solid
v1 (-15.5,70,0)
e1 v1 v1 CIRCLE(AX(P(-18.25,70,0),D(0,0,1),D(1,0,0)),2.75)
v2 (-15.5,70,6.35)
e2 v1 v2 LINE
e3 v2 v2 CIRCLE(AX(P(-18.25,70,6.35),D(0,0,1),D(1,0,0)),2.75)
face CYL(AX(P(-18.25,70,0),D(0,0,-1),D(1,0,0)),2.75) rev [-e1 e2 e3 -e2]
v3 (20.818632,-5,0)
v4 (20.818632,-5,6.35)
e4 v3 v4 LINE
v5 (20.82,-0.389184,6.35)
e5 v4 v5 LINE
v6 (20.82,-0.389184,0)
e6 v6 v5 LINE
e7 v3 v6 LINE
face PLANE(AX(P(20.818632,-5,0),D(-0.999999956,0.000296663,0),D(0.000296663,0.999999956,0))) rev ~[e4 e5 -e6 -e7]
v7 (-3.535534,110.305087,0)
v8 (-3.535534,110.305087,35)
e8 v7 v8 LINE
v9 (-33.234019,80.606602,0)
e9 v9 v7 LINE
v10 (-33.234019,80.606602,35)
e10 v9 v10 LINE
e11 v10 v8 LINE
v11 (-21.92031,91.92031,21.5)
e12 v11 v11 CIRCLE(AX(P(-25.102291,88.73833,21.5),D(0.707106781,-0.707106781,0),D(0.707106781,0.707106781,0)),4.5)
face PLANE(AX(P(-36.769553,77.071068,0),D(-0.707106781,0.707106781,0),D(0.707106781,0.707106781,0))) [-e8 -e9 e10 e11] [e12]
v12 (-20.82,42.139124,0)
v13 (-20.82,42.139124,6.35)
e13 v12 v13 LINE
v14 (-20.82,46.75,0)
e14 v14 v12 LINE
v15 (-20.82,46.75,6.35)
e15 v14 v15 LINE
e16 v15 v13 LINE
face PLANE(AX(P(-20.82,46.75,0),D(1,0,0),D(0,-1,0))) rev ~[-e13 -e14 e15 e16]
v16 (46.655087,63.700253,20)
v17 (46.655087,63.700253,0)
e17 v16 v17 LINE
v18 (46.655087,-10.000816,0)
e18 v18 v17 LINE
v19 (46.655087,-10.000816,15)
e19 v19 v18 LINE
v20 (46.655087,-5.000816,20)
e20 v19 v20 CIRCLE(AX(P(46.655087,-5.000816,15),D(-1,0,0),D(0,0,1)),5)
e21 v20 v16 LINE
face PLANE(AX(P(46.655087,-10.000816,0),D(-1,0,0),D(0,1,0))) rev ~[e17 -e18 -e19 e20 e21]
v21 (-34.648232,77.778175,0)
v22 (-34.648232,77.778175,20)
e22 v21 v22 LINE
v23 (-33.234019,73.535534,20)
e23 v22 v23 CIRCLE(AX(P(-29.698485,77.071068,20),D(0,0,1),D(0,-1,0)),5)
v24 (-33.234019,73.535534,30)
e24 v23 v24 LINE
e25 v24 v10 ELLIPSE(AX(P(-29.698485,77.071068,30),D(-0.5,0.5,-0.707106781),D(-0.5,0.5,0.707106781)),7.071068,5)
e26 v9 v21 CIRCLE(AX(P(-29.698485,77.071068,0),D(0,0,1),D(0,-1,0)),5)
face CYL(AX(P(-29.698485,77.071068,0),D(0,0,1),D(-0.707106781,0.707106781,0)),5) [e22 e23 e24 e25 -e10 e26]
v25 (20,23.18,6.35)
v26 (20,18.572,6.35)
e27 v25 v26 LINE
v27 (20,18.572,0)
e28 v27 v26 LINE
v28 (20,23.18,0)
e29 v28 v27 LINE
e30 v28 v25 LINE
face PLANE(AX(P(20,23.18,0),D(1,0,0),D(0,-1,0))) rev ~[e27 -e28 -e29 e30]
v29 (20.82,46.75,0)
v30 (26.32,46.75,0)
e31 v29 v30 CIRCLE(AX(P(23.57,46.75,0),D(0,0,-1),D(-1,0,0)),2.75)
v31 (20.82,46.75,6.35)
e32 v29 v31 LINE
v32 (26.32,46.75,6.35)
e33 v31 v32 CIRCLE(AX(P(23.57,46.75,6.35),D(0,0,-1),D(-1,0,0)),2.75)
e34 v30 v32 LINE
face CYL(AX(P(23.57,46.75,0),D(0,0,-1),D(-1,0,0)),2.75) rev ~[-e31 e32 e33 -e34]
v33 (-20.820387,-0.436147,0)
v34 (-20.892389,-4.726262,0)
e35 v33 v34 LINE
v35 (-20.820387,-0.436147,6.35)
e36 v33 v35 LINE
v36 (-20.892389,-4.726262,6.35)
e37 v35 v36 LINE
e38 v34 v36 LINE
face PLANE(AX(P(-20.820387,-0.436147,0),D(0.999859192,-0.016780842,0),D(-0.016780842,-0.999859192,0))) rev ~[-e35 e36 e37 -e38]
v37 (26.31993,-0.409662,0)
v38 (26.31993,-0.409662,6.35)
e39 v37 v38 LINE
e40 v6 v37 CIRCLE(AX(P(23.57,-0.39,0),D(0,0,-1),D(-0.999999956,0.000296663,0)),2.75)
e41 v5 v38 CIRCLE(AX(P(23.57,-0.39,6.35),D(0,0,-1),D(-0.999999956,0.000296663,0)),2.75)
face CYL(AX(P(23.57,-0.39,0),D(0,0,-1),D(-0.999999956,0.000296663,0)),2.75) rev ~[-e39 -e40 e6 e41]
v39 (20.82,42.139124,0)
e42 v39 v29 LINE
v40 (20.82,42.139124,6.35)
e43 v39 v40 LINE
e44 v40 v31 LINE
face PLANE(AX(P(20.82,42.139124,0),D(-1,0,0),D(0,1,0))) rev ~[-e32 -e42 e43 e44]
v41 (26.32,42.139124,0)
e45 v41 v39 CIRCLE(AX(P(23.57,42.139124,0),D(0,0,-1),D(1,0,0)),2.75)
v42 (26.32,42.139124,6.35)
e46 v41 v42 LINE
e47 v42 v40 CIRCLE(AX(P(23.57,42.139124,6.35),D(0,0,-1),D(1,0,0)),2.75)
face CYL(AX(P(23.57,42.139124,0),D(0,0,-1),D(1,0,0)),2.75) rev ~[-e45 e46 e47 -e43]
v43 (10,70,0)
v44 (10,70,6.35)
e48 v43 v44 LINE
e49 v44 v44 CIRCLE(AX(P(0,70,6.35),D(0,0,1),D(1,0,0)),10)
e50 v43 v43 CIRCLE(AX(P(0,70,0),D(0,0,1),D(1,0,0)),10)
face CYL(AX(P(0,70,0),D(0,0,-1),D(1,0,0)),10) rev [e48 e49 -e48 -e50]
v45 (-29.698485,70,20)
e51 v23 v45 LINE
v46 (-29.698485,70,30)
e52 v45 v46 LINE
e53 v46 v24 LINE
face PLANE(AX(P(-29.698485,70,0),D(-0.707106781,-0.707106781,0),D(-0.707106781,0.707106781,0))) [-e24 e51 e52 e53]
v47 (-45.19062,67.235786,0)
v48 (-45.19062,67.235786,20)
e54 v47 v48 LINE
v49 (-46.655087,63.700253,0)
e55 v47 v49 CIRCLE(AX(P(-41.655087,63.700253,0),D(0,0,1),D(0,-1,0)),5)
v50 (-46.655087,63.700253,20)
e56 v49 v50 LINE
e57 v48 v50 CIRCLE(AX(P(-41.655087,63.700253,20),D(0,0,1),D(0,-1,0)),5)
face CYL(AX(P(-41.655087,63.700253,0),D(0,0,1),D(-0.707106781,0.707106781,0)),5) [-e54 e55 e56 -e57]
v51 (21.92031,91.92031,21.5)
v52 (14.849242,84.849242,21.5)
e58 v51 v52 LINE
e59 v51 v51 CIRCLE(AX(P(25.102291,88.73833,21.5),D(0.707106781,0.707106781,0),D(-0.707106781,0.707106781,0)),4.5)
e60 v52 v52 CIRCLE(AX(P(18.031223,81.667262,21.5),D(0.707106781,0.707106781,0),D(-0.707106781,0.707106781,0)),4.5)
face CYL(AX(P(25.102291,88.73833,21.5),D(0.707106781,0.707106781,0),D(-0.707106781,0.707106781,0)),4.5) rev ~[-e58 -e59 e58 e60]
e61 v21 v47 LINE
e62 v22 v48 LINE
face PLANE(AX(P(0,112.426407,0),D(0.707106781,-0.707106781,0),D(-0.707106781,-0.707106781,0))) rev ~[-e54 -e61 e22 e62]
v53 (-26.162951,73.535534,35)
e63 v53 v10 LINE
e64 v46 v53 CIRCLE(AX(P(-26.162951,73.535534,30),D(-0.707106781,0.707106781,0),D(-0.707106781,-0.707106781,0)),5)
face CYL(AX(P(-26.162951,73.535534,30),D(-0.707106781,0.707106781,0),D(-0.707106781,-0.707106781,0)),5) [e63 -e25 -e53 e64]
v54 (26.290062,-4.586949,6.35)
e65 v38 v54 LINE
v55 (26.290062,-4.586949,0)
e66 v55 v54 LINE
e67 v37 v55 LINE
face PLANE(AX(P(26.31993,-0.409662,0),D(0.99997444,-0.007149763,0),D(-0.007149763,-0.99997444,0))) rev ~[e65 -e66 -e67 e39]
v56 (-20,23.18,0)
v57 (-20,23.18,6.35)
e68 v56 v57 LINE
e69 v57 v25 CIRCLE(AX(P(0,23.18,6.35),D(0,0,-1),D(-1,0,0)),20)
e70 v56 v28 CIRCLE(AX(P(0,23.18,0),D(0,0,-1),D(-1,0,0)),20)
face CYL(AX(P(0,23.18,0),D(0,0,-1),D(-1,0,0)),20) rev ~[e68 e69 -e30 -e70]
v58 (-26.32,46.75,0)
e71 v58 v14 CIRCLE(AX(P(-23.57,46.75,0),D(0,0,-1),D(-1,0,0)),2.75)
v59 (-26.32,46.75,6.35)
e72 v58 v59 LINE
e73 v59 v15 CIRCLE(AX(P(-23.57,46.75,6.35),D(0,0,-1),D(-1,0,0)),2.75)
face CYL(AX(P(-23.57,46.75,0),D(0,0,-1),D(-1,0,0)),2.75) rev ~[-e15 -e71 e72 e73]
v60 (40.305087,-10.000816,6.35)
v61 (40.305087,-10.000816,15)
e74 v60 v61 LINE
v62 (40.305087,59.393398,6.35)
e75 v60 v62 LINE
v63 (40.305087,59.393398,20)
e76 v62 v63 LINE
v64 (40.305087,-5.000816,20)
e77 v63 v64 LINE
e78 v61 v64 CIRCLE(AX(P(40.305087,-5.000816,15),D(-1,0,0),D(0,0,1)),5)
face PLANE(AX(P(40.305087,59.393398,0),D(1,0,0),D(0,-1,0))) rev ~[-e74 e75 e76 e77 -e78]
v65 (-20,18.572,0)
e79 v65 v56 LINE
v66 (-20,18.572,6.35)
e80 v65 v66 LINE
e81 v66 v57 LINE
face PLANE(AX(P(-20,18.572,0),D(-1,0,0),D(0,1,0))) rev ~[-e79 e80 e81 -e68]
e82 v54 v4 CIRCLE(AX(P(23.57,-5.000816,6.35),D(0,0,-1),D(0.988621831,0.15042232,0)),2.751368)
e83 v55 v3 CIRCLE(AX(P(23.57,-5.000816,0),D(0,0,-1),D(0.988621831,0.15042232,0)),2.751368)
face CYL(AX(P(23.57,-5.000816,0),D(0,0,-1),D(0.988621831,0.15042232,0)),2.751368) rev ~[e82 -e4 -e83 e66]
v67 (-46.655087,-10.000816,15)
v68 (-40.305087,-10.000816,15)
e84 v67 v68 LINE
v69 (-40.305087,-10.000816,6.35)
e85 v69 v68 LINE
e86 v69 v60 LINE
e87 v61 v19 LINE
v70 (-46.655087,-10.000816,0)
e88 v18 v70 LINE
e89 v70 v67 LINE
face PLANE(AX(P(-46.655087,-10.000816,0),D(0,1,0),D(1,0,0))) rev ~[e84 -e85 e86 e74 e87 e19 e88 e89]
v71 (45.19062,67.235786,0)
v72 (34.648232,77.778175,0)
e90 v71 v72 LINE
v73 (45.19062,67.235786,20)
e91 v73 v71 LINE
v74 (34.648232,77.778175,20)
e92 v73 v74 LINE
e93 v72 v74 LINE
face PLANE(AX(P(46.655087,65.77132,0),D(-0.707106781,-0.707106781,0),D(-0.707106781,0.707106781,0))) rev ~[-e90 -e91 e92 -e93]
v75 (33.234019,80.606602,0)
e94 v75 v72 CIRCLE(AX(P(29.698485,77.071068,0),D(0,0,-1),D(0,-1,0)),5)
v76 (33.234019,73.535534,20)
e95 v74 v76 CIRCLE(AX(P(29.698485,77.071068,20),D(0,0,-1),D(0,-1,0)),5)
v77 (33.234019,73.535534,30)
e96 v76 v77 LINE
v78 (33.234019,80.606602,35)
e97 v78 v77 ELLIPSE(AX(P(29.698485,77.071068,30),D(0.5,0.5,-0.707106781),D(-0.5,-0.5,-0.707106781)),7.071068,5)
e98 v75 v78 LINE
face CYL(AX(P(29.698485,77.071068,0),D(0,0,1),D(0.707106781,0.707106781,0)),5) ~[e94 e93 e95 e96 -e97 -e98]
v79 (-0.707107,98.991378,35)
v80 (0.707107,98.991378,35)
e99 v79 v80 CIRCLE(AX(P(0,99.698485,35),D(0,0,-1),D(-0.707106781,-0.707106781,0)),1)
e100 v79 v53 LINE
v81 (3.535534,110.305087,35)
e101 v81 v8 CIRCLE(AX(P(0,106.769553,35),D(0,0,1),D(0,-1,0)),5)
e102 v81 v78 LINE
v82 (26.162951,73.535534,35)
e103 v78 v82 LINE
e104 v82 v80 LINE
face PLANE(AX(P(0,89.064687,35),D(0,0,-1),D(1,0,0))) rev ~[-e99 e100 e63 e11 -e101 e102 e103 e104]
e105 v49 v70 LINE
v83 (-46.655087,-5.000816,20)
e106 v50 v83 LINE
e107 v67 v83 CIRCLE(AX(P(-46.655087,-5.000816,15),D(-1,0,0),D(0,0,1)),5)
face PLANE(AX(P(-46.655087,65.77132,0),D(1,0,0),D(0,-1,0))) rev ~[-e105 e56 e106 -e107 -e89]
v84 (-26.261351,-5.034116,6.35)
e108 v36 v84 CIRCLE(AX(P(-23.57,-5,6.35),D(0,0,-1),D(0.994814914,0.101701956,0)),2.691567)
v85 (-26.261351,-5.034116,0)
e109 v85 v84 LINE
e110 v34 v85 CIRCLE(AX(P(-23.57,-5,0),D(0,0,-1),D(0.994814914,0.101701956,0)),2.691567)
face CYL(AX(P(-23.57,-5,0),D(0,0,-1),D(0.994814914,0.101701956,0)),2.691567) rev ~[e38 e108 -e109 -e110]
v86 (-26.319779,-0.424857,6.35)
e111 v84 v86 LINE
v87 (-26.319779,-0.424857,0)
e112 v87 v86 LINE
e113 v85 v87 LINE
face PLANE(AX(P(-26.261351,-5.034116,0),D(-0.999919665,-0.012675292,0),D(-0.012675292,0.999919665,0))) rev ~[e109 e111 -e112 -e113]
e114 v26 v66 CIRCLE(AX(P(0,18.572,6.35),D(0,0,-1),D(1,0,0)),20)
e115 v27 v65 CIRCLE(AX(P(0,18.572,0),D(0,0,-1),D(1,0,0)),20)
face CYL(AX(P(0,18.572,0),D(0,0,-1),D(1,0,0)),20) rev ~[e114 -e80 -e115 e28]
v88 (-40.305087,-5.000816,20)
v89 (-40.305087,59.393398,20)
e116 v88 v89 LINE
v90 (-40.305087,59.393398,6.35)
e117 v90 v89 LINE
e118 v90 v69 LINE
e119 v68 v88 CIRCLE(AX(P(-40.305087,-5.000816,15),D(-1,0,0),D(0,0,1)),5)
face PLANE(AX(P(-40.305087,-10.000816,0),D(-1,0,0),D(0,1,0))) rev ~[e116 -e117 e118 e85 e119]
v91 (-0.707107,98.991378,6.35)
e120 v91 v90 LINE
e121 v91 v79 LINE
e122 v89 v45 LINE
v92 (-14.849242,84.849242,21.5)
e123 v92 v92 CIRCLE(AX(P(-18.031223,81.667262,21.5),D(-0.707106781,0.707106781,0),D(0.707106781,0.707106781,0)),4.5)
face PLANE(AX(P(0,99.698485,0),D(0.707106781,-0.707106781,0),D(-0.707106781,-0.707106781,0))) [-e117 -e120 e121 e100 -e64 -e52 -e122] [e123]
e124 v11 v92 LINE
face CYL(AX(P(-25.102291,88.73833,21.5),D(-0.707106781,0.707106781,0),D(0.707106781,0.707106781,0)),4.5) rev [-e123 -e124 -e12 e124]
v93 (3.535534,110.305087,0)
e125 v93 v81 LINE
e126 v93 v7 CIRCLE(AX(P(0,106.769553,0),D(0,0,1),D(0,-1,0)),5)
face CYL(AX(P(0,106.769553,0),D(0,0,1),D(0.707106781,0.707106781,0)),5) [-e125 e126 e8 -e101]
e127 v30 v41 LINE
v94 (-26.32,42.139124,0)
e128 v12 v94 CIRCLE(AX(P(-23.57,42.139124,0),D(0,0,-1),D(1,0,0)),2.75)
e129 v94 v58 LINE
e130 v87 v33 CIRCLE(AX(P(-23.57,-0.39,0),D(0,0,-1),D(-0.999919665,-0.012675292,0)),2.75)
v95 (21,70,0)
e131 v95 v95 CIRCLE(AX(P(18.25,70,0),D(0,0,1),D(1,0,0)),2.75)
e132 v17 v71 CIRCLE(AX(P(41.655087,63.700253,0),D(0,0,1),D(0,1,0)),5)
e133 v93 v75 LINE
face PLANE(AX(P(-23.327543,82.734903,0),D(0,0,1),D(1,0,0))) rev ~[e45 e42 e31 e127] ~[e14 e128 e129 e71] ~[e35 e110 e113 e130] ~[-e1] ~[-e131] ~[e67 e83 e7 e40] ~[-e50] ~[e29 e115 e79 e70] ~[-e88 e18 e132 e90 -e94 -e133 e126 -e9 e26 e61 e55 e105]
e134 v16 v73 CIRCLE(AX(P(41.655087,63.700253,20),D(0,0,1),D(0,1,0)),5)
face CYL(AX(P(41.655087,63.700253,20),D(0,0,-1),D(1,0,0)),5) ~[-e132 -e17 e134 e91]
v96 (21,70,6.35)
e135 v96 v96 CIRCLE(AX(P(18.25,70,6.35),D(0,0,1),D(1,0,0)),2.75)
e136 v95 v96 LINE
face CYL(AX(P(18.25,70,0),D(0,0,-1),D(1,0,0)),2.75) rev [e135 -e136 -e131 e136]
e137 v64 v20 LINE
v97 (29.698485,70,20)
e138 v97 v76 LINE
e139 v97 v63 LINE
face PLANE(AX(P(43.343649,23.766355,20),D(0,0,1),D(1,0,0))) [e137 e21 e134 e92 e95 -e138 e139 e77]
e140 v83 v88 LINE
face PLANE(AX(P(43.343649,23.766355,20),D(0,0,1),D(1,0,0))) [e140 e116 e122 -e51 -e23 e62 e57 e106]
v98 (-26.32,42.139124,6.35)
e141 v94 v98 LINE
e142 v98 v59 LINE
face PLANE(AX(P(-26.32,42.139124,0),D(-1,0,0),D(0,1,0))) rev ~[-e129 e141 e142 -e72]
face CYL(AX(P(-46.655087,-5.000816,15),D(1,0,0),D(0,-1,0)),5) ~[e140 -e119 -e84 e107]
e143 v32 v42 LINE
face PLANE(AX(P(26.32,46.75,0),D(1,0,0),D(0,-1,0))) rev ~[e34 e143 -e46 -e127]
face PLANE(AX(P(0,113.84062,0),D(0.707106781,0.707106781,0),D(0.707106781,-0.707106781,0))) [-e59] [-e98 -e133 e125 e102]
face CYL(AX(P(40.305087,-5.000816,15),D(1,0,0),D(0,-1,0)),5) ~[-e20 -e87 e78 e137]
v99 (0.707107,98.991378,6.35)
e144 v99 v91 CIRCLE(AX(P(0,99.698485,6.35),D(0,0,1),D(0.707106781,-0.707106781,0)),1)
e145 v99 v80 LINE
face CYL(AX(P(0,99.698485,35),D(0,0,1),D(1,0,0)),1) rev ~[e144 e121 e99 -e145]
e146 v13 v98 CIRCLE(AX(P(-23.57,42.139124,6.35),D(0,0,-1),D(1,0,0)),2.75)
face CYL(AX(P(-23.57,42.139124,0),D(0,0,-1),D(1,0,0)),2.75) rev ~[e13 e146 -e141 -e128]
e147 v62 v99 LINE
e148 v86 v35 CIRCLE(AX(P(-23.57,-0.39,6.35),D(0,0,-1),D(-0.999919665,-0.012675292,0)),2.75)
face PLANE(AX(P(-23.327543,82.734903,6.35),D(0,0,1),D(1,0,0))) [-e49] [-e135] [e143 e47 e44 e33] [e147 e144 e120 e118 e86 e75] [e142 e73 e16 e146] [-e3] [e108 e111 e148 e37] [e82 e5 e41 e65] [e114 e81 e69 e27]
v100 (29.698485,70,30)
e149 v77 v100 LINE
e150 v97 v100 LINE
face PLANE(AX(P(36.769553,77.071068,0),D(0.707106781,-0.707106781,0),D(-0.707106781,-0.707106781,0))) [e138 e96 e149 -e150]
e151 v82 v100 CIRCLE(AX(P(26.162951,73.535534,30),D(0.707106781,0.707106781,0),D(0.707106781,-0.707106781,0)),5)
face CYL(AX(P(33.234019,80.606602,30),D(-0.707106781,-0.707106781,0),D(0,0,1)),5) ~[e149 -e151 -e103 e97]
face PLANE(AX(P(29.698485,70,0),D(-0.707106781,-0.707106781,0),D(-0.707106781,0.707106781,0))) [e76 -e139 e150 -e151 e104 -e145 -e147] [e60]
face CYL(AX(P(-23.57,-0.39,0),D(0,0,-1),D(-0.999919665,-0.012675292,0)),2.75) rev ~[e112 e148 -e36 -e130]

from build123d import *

# Parameters (mm, degrees)
F0_R      = 2.75
F0_R_2    = 10
F1_DEPTH  = 6.35
F3_DEPTH  = 6.35
F4_DEPTH  = 20
F6_DEPTH  = 35
F7_R      = 4.5
F8_DEPTH  = 12.6
F9_R      = 5
F10_R     = 1
F11_DEPTH = 28.65


# Not quite as in the source:
# - a feature names something its author has since deleted; it is built from what else it names


with BuildPart() as f1:
    # F0 (on Top) → F1 (new body)
    with BuildSketch(Plane.XY):
        Polygon((0, 99.6984848098), (-29.6984848098, 70), (-29.6984848098, -10.0008162295), (29.6984848098, -10.0008162295), (29.6984848098, 70), align=None)
        with BuildLine():
            Line((-26.2613506757, -5.0341163975), (-26.3197790794, -0.4248570541))
            ThreePointArc((-26.3197790794, -0.4248570541), (-23.5643542567, 2.3599942046), (-20.8203872227, -0.436147316))
            Line((-20.8203872227, -0.436147316), (-20.892389105, -4.7262623825))
            ThreePointArc((-20.892389105, -4.7262623825), (-23.4159197643, -7.6871530789), (-26.2613506757, -5.0341163975))
        make_face(mode=Mode.SUBTRACT)
        with BuildLine():
            ThreePointArc((-26.32, 46.75), (-23.57, 49.5), (-20.82, 46.75))
            Line((-20.82, 46.75), (-20.82, 42.1391243117))
            ThreePointArc((-20.82, 42.1391243117), (-23.57, 39.3891243117), (-26.32, 42.1391243117))
            Line((-26.32, 42.1391243117), (-26.32, 46.75))
        make_face(mode=Mode.SUBTRACT)
        with BuildLine():
            ThreePointArc((-20, 23.18), (0, 43.18), (20, 23.18))
            Line((20, 23.18), (20, 18.572))
            ThreePointArc((20, 18.572), (0, -1.428), (-20, 18.572))
            Line((-20, 18.572), (-20, 23.18))
        make_face(mode=Mode.SUBTRACT)
        with BuildLine():
            ThreePointArc((20.820000121, -0.3891841763), (23.5802388964, 2.359980939), (26.3199297103, -0.409661849))
            Line((26.3199297103, -0.409661849), (26.290062332, -4.5869490924))
            ThreePointArc((26.290062332, -4.5869490924), (23.7771177689, -7.7443772963), (20.8186322617, -5))
            Line((20.8186322617, -5), (20.820000121, -0.3891841763))
        make_face(mode=Mode.SUBTRACT)
        with BuildLine():
            Line((20.82, 42.1391243117), (20.82, 46.75))
            ThreePointArc((20.82, 46.75), (23.57, 49.5), (26.32, 46.75))
            Line((26.32, 46.75), (26.32, 42.1391243117))
            ThreePointArc((26.32, 42.1391243117), (23.57, 39.3891243117), (20.82, 42.1391243117))
        make_face(mode=Mode.SUBTRACT)
        with Locations((-18.25, 70)):
            Circle(F0_R, mode=Mode.SUBTRACT)
        with Locations((0, 70)):
            Circle(F0_R_2, mode=Mode.SUBTRACT)
        with Locations((18.25, 70)):
            Circle(F0_R, mode=Mode.SUBTRACT)
    extrude(amount=F1_DEPTH)

    # F2 (on Top) → F3 (join)
    with BuildSketch(Plane.XY):
        Polygon((-29.6984848098, 70), (0, 99.6984848098), (0, 112.4264068712), (-46.6550865276, 65.7713203436), (-46.6550865276, 53.0433982822), (-40.3050865276, 59.3933982822), align=None)
        Polygon((-29.6984848098, -10.0008162295), (-29.6984848098, 70), (-40.3050865276, 59.3933982822), (-40.3050865276, -10.0008162295), align=None)
        Polygon((-40.3050865276, -10.0008162295), (-40.3050865276, 59.3933982822), (-46.6550865276, 53.0433982822), (-46.6550865276, -10.0008162295), align=None)
        Polygon((40.3050865276, 59.3933982822), (29.6984848098, 70), (29.6984848098, -10.0008162295), (40.3050865276, -10.0008162295), align=None)
        Polygon((46.6550865276, 53.0433982822), (40.3050865276, 59.3933982822), (40.3050865276, -10.0008162295), (46.6550865276, -10.0008162295), align=None)
        Polygon((0, 112.4264068712), (0, 99.6984848098), (29.6984848098, 70), (40.3050865276, 59.3933982822), (46.6550865276, 53.0433982822), (46.6550865276, 65.7713203436), align=None)
    extrude(amount=F3_DEPTH)

    # F2 (on Top) → F4 (join)
    with BuildSketch(Plane.XY):
        Polygon((46.6550865276, 53.0433982822), (40.3050865276, 59.3933982822), (40.3050865276, -10.0008162295), (46.6550865276, -10.0008162295), align=None)
        Polygon((-40.3050865276, -10.0008162295), (-40.3050865276, 59.3933982822), (-46.6550865276, 53.0433982822), (-46.6550865276, -10.0008162295), align=None)
        Polygon((0, 112.4264068712), (0, 99.6984848098), (29.6984848098, 70), (40.3050865276, 59.3933982822), (46.6550865276, 53.0433982822), (46.6550865276, 65.7713203436), align=None)
        Polygon((-29.6984848098, 70), (0, 99.6984848098), (0, 112.4264068712), (-46.6550865276, 65.7713203436), (-46.6550865276, 53.0433982822), (-40.3050865276, 59.3933982822), align=None)
    extrude(amount=F4_DEPTH)

    # F5 (on face) → F6 (join)
    with BuildSketch(Plane(origin=(0, 0, 0), x_dir=(1, 0, 0), z_dir=(0, 0, -1))):
        Polygon((0, -99.6984848098), (-29.6984848098, -70), (-36.7695526217, -77.0710678119), (-5.8406204336, -108), (0, -113.8406204336), (5.8406204336, -108), (36.7695526217, -77.0710678119), (29.6984848098, -70), align=None)
    extrude(amount=-F6_DEPTH)

    # F9 (call 1 of 7: OpenCascade refuses the feature's edges together)
    f9_edges = [f1.edges().sort_by_distance(p)[0] for p in [
        (33.234019, 73.535534, 35),
        (36.769553, 77.071068, 17.5),
    ]]
    fillet(f9_edges, radius=F9_R)

    # F9#2 (call 2 of 7)
    f9_2_edges = [f1.edges().sort_by_distance(p)[0] for p in [
        (-33.234019, 73.535534, 35),
        (-36.769553, 77.071068, 17.5),
    ]]
    fillet(f9_2_edges, radius=F9_R)

    # F9#3 (call 3 of 7)
    f9_3_edges = [f1.edges().sort_by_distance(p)[0] for p in [
        (43.480087, -10.000816, 20),
    ]]
    fillet(f9_3_edges, radius=F9_R)

    # F9#4 (call 4 of 7)
    f9_4_edges = [f1.edges().sort_by_distance(p)[0] for p in [
        (-43.480087, -10.000816, 20),
    ]]
    fillet(f9_4_edges, radius=F9_R)

    # F9#5 (call 5 of 7)
    f9_5_edges = [f1.edges().sort_by_distance(p)[0] for p in [
        (46.655087, 65.77132, 10),
    ]]
    fillet(f9_5_edges, radius=F9_R)

    # F9#6 (call 6 of 7)
    f9_6_edges = [f1.edges().sort_by_distance(p)[0] for p in [
        (0, 113.84062, 17.5),
    ]]
    fillet(f9_6_edges, radius=F9_R)

    # F9#7 (call 7 of 7)
    f9_7_edges = [f1.edges().sort_by_distance(p)[0] for p in [
        (-46.655087, 65.77132, 10),
    ]]
    fillet(f9_7_edges, radius=F9_R)

    # F10 (on face) → F11 (cut, through all)
    with BuildSketch(Plane.XY.offset(35)):
        with Locations((0, 99.6984848098)):
            Circle(F10_R)
    extrude(amount=-F11_DEPTH, mode=Mode.SUBTRACT)


with BuildPart() as f8:
    # F7 (on face) → F8 (new body)
    with BuildSketch(Plane(origin=(56.9203102168, 56.9203102168, 0), x_dir=(-0.7071067812, 0.7071067812, 0), z_dir=(0.7071067812, 0.7071067812, 0))):
        with Locations((44.9974746831, 21.5)):
            Circle(F7_R)
    extrude(amount=-F8_DEPTH)


with BuildPart() as f12_1:
    # F12: instance of F8
    add(f8.part.mirror(Plane.YZ))


with BuildPart() as f1_1:
    add(f1.part)

    # F13: cut F12_1, F8
    add(f12_1.part, mode=Mode.SUBTRACT)
    add(f8.part, mode=Mode.SUBTRACT)


solid = f1_1.part
